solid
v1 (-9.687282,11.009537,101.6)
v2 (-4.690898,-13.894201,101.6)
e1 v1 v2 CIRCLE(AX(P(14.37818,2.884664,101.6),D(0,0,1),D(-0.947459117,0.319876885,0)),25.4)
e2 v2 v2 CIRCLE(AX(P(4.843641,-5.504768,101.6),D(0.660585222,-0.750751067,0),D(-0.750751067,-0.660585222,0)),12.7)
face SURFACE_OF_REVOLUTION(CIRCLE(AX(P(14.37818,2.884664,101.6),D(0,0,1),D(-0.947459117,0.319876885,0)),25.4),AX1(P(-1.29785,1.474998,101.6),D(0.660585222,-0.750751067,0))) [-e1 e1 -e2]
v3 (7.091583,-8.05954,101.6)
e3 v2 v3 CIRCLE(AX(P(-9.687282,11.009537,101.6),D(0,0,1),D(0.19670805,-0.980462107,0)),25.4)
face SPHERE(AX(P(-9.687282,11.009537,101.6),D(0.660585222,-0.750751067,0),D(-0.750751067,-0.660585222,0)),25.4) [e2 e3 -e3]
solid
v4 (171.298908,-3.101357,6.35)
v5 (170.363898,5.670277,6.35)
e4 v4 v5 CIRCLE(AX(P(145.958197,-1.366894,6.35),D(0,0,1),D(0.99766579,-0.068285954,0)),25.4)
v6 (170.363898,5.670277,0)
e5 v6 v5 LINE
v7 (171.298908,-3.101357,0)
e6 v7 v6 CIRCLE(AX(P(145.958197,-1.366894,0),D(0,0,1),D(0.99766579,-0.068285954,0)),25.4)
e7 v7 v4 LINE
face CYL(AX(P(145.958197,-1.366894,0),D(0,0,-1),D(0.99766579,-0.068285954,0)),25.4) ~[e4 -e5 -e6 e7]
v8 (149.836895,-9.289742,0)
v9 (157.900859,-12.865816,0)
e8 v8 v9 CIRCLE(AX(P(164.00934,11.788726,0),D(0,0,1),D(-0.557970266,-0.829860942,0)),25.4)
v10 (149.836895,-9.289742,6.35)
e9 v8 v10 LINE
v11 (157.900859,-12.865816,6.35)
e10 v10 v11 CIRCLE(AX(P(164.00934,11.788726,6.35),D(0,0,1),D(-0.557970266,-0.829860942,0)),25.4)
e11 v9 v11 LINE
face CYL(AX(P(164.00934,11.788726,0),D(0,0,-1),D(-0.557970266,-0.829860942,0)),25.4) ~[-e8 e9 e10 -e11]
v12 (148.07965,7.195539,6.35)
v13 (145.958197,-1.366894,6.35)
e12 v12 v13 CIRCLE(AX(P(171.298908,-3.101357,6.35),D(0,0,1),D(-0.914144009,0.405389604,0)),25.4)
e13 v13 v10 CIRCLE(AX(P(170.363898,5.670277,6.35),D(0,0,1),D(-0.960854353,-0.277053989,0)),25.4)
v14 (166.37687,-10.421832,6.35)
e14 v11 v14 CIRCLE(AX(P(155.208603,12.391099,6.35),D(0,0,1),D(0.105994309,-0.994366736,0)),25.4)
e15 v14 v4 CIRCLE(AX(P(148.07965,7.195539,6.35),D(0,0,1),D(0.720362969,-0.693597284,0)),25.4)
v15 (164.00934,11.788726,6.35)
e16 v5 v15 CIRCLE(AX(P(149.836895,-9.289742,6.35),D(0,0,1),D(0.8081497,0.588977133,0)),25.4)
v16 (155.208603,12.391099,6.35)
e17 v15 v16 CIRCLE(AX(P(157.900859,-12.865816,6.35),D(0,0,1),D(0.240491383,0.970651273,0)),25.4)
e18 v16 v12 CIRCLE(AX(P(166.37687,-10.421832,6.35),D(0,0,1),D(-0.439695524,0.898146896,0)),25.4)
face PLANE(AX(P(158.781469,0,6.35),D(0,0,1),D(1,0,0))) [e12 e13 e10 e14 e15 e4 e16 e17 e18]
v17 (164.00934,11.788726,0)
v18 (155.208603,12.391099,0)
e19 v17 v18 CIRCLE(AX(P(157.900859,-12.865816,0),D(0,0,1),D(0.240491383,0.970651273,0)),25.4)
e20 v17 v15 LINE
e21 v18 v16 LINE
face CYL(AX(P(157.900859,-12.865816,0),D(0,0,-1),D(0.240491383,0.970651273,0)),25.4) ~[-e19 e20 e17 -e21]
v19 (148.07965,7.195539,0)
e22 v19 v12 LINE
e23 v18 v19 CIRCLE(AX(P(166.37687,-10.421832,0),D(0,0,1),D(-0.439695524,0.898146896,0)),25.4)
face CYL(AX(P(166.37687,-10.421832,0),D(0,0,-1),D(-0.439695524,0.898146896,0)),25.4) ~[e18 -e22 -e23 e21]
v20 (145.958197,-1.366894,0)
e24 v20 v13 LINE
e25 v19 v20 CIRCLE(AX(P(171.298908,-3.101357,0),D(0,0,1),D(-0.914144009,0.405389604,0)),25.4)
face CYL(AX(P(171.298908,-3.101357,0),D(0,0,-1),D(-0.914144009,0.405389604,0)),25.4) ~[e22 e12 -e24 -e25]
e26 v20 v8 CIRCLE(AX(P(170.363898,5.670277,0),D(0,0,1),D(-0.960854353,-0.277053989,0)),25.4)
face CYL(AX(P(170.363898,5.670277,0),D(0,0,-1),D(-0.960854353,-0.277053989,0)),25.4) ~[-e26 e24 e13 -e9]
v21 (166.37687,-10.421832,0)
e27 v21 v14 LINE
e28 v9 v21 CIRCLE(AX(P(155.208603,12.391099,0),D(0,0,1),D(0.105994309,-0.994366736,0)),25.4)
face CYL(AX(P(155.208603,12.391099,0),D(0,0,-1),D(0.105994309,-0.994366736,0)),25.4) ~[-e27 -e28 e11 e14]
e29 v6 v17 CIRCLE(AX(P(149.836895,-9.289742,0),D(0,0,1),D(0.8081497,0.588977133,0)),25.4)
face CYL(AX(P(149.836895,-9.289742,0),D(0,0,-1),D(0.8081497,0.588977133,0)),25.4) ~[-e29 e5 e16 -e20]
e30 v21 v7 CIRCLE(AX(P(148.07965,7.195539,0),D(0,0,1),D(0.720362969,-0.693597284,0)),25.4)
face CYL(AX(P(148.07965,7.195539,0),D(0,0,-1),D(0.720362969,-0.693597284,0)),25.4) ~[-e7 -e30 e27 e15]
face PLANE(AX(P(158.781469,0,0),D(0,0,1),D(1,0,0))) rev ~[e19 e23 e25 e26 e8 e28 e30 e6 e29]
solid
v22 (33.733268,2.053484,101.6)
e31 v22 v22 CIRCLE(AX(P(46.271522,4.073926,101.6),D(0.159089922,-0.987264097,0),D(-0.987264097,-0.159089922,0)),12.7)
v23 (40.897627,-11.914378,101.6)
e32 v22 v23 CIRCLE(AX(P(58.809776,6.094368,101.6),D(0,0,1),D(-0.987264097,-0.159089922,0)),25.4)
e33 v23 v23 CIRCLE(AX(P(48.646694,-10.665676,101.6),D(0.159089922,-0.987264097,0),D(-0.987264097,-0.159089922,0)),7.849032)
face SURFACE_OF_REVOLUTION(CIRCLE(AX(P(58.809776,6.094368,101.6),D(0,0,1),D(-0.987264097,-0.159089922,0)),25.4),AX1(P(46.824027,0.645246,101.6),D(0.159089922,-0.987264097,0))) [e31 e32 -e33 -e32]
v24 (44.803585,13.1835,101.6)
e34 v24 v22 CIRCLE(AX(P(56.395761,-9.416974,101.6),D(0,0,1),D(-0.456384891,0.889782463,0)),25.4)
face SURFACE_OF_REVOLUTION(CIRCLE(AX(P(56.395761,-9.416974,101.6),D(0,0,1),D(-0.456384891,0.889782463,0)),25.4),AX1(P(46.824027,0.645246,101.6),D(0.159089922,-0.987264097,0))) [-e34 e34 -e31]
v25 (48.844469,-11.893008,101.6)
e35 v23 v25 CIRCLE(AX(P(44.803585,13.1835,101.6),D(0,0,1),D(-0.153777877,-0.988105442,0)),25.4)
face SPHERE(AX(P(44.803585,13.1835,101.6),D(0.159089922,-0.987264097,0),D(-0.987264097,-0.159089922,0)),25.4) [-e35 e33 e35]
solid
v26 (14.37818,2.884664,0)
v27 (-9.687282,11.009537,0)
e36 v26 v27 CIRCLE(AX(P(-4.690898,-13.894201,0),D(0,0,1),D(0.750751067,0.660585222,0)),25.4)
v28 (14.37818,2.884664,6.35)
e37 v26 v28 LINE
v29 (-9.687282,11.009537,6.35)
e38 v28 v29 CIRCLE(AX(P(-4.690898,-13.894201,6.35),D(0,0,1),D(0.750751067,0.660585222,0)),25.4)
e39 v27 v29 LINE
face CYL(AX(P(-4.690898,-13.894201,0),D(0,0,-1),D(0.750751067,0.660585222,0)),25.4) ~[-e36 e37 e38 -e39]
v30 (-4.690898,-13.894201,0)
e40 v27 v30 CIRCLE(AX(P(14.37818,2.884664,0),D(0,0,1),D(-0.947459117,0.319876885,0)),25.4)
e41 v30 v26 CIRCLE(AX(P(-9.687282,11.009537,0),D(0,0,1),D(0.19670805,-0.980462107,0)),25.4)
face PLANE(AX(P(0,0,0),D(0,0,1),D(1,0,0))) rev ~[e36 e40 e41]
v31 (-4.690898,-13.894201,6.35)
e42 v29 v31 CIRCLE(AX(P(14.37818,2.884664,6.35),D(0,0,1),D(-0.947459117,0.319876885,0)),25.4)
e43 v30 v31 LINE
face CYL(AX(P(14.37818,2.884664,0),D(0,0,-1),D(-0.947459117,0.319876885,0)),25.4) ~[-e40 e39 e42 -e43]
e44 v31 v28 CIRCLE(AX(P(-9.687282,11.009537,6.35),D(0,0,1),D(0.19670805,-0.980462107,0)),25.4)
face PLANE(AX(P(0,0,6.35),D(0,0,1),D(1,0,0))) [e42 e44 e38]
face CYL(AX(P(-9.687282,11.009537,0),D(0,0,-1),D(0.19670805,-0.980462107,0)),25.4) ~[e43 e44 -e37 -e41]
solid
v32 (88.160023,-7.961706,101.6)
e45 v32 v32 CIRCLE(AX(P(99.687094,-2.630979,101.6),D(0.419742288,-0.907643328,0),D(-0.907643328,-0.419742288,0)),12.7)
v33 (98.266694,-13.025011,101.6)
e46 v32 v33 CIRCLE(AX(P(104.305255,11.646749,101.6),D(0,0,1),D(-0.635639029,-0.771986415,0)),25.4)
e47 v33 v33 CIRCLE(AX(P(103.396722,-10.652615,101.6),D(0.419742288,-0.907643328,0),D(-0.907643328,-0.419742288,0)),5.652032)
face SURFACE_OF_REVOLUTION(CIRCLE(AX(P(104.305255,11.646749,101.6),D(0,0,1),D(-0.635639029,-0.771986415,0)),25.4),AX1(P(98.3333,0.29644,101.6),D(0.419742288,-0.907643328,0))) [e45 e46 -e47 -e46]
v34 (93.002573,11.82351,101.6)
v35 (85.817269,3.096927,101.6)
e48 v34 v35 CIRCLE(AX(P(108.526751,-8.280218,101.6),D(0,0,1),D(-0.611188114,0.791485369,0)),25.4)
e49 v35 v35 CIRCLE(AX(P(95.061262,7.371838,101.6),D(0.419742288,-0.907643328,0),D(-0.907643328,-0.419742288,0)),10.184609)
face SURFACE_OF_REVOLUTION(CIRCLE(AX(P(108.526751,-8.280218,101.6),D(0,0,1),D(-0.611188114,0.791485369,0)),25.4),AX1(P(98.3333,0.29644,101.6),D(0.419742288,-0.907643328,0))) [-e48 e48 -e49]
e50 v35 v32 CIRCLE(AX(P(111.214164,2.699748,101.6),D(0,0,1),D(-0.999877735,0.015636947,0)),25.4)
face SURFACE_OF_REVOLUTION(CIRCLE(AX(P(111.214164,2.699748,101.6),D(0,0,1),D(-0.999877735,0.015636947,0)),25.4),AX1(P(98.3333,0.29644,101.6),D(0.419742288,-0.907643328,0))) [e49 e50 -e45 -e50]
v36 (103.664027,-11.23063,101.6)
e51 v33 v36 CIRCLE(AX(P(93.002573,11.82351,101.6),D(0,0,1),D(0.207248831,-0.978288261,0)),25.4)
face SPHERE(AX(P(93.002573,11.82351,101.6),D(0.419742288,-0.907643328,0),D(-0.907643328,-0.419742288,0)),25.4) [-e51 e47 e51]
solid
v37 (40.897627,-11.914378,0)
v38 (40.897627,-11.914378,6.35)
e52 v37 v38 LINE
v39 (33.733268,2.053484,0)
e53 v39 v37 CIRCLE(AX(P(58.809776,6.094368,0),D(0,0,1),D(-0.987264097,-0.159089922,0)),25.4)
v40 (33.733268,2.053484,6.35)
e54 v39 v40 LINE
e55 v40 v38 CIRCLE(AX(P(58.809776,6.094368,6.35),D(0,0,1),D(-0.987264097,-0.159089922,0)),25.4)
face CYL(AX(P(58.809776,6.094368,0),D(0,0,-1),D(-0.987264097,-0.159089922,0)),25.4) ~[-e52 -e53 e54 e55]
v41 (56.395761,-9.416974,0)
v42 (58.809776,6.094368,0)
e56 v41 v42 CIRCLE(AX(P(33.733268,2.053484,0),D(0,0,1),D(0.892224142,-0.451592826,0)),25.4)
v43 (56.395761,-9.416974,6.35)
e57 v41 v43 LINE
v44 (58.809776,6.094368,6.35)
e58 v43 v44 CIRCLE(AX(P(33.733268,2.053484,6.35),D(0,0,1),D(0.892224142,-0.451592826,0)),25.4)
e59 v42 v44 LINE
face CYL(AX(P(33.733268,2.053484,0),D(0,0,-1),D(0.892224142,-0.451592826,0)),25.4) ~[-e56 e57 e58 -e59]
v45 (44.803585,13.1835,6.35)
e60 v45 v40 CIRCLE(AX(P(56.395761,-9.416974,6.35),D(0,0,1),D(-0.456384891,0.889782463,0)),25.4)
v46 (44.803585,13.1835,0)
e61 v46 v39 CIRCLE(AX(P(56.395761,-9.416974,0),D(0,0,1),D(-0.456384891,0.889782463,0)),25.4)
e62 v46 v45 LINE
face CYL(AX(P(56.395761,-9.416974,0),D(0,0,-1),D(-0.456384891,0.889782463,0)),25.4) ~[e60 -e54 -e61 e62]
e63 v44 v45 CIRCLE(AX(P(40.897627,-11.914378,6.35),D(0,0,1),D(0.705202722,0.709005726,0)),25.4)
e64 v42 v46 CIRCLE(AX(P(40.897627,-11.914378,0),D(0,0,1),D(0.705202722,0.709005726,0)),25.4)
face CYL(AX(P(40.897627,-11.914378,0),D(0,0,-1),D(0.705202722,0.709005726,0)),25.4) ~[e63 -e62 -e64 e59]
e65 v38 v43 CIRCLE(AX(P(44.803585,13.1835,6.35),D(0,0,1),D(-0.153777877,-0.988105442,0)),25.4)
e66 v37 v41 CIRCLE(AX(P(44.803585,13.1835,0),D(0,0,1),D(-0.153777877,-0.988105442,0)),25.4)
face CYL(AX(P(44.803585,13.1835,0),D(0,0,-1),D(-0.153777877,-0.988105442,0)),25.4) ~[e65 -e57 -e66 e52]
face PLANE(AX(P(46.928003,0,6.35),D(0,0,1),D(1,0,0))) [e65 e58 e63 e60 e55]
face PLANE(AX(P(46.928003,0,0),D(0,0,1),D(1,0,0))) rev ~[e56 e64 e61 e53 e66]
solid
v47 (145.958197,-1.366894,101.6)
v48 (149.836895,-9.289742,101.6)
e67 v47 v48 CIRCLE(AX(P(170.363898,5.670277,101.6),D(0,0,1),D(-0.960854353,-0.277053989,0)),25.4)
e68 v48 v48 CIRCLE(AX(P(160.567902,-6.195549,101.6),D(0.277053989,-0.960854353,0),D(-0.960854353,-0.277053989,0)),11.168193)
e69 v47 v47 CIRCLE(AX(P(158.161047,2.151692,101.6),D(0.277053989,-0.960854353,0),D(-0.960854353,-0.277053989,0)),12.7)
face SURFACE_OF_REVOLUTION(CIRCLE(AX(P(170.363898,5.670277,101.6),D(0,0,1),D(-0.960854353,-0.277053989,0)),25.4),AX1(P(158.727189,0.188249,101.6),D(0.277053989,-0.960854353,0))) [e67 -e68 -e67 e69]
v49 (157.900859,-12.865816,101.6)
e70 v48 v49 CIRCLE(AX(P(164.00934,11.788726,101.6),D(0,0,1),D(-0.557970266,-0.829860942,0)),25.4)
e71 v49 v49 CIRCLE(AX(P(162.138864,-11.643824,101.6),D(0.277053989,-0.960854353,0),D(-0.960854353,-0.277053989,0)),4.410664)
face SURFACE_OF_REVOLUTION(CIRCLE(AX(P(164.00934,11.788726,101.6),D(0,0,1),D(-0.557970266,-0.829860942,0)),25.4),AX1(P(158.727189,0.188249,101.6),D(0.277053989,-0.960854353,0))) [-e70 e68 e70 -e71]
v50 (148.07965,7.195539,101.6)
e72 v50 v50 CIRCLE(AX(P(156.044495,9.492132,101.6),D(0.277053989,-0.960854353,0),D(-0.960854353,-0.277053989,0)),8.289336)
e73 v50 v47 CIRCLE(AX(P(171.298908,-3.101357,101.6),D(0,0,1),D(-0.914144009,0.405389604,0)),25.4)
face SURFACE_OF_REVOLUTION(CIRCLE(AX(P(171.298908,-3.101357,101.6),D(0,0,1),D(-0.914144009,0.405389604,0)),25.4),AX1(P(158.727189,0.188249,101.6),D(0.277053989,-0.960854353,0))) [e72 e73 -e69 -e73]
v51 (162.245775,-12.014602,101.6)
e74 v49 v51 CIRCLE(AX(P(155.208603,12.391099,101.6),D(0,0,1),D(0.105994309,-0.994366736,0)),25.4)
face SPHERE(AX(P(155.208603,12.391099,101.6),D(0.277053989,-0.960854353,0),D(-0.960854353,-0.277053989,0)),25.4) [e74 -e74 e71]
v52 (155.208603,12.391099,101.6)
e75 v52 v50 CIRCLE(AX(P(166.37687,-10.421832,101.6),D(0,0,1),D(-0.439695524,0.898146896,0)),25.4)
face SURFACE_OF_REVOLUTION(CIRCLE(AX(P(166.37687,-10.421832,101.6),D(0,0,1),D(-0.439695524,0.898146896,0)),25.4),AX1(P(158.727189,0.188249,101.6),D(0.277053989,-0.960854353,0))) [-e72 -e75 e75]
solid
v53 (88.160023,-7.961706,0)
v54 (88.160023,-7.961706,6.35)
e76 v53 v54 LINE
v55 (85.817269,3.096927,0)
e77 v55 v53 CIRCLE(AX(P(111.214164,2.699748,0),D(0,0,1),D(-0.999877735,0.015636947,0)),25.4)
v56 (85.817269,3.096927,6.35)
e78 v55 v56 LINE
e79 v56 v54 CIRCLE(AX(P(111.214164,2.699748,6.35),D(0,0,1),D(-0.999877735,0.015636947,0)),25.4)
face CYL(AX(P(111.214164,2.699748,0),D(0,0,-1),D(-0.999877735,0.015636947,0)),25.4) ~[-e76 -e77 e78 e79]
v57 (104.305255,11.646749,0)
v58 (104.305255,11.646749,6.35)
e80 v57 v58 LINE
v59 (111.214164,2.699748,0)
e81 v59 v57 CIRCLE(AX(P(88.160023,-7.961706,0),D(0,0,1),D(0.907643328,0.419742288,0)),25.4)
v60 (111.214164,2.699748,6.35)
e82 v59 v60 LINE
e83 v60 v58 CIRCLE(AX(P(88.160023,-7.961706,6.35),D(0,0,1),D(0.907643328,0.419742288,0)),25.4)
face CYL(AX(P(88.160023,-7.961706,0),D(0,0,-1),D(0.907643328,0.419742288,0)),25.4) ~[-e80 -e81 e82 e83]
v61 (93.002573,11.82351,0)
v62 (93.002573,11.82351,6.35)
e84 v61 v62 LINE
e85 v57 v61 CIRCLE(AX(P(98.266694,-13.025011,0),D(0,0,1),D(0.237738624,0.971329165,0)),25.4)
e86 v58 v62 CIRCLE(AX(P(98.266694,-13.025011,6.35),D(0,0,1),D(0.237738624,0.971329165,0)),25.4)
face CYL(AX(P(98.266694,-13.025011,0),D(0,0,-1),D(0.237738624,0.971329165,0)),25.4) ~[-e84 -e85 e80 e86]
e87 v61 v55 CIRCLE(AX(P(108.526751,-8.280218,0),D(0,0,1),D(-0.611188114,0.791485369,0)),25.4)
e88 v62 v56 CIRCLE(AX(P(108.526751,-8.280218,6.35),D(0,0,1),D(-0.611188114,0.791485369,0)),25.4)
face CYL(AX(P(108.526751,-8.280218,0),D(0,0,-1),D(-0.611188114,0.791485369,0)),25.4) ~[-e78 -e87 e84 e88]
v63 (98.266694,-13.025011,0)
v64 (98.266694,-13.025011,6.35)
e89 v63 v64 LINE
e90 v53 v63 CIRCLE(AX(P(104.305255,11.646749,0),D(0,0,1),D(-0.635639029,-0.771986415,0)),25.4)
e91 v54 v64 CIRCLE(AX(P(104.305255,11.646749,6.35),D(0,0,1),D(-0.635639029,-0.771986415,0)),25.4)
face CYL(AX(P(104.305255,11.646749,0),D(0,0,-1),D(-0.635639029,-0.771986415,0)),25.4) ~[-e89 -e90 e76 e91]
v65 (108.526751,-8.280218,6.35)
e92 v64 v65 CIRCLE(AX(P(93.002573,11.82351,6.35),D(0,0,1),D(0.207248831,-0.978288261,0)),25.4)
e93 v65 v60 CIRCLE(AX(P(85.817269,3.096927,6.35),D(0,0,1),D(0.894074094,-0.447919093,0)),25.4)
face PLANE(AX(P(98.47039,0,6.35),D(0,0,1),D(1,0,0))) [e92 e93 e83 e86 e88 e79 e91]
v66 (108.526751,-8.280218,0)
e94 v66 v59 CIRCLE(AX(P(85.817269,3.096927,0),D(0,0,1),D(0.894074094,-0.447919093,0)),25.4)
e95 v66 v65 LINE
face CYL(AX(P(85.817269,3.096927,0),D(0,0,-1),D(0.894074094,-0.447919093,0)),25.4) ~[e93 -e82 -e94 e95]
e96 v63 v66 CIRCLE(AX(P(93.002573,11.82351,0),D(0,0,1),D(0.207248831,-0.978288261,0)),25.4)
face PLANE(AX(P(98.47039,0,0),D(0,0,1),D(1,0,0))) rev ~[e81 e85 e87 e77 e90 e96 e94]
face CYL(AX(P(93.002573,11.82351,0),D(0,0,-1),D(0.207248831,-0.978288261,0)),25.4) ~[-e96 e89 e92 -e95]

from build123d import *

# Parameters (mm, degrees)
F2_DEPTH = 6.35


# Not quite as in the source:
# - a variable given as a bare number and used for a length is read in inches; the dataset says mm whatever the document's units were


with BuildPart() as f2:
    # F1 (on Top) → F2 (new body)
    with BuildSketch(Plane.XY):
        with BuildLine():
            ThreePointArc((14.3781795579, 2.8846639207), (3.433975334, 10.1712608559), (-9.6872820156, 11.0095367969))
            ThreePointArc((-9.6872820156, 11.0095367969), (-10.5255579567, -2.1117205527), (-4.6908975422, -13.8942007176))
            ThreePointArc((-4.6908975422, -13.8942007176), (7.0915826227, -8.0595403031), (14.3781795579, 2.8846639207))
        make_face()
    extrude(amount=F2_DEPTH)


with BuildPart() as f2b:
    # F1 (on Top) → F2, piece 2 (new body)
    with BuildSketch(Plane.XY):
        with BuildLine():
            ThreePointArc((44.8035849855, 13.1835004697), (38.3870157524, 8.4951750576), (33.7332679985, 2.0534836852))
            ThreePointArc((33.7332679985, 2.0534836852), (36.2093014936, -5.4978085238), (40.8976269057, -11.9143777569))
            ThreePointArc((40.8976269057, -11.9143777569), (48.8444689961, -11.8930075889), (56.3957612051, -9.4169740938))
            ThreePointArc((56.3957612051, -9.4169740938), (58.8311462251, -1.8524743946), (58.8097760571, 6.0943676958))
            ThreePointArc((58.8097760571, 6.0943676958), (52.3680846847, 10.7481154497), (44.8035849855, 13.1835004697))
        make_face()
    extrude(amount=F2_DEPTH)


with BuildPart() as f2c:
    # F1 (on Top) → F2, piece 3 (new body)
    with BuildSketch(Plane.XY):
        with BuildLine():
            ThreePointArc((104.3052545657, 11.6467493191), (98.6638719794, 12.371883009), (93.0025732068, 11.8235103614))
            ThreePointArc((93.0025732068, 11.8235103614), (88.9182963481, 7.8650133115), (85.817269298, 3.096926946))
            ThreePointArc((85.817269298, 3.096926946), (86.3656419456, -2.5643718266), (88.1600232362, -7.9617056256))
            ThreePointArc((88.1600232362, -7.9617056256), (92.9281096017, -11.0627326756), (98.2666935225, -13.0250114719))
            ThreePointArc((98.2666935225, -13.0250114719), (103.6640273214, -11.2306301812), (108.5267512927, -8.2802180181))
            ThreePointArc((108.5267512927, -8.2802180181), (110.489030089, -2.9416340973), (111.2141637789, 2.699748489))
            ThreePointArc((111.2141637789, 2.699748489), (108.2637516157, 7.5624724603), (104.3052545657, 11.6467493191))
        make_face()
    extrude(amount=F2_DEPTH)


with BuildPart() as f2d:
    # F1 (on Top) → F2, piece 4 (new body)
    with BuildSketch(Plane.XY):
        with BuildLine():
            ThreePointArc((164.0093399435, 11.788726154), (159.6353220402, 12.4748948753), (155.2086033491, 12.3910989139))
            ThreePointArc((155.2086033491, 12.3910989139), (151.4168504878, 10.1051701371), (148.079650239, 7.1955387803))
            ThreePointArc((148.079650239, 7.1955387803), (146.6443657243, 3.0071239853), (145.958197003, -1.3668939181))
            ThreePointArc((145.958197003, -1.3668939181), (147.5509664107, -5.4979888997), (149.8368951876, -9.2897417609))
            ThreePointArc((149.8368951876, -9.2897417609), (153.7124440102, -11.4305316752), (157.9008588052, -12.8658161898))
            ThreePointArc((157.9008588052, -12.8658161898), (162.2457746766, -12.0146016436), (166.3768696582, -10.4218322359))
            ThreePointArc((166.3768696582, -10.4218322359), (169.1581181539, -6.9769059756), (171.2989080681, -3.101357153))
            ThreePointArc((171.2989080681, -3.101357153), (171.2151121068, 1.3253615381), (170.3638975606, 5.6702774095))
            ThreePointArc((170.3638975606, 5.6702774095), (167.4542662038, 9.0074776583), (164.0093399435, 11.788726154))
        make_face()
    extrude(amount=F2_DEPTH)


with BuildPart() as f5:
    # F4 (on offset) → F5 (revolve)
    with BuildSketch(Plane.XY.offset(101.6)):
        with BuildLine():
            Line((7.0915826227, -8.0595403031), (-9.6872820156, 11.0095367969))
            ThreePointArc((-9.6872820156, 11.0095367969), (-10.5255579567, -2.1117205527), (-4.6908975422, -13.8942007176))
            ThreePointArc((-4.6908975422, -13.8942007176), (1.5844163483, -11.7524669811), (7.0915826227, -8.0595403031))
        make_face()
    revolve(axis=Axis((-1.2978496965, 1.4749982469, 101.6), (0.660585222, -0.7507510669, 0)))


with BuildPart() as f6:
    # F4 (on offset) → F6 (revolve)
    with BuildSketch(Plane.XY.offset(101.6)):
        with BuildLine():
            ThreePointArc((44.8035849855, 13.1835004697), (38.3870157524, 8.4951750576), (33.7332679985, 2.0534836852))
            ThreePointArc((33.7332679985, 2.0534836852), (36.2093014936, -5.4978085238), (40.8976269057, -11.9143777569))
            ThreePointArc((40.8976269057, -11.9143777569), (44.8718888853, -12.2164076911), (48.8444689961, -11.8930075889))
            Line((48.8444689961, -11.8930075889), (44.8035849855, 13.1835004697))
        make_face()
    revolve(axis=Axis((46.8240269908, 0.6452464404, 101.6), (0.1590899217, -0.9872640968, 0)))


with BuildPart() as f7:
    # F4 (on offset) → F7 (revolve)
    with BuildSketch(Plane.XY.offset(101.6)):
        with BuildLine():
            Line((103.6640273214, -11.2306301812), (93.0025732068, 11.8235103614))
            ThreePointArc((93.0025732068, 11.8235103614), (88.9182963481, 7.8650133115), (85.817269298, 3.096926946))
            ThreePointArc((85.817269298, 3.096926946), (86.3656419456, -2.5643718266), (88.1600232362, -7.9617056256))
            ThreePointArc((88.1600232362, -7.9617056256), (92.9281096017, -11.0627326756), (98.2666935225, -13.0250114719))
            ThreePointArc((98.2666935225, -13.0250114719), (101.0157455678, -12.2793747089), (103.6640273214, -11.2306301812))
        make_face()
    revolve(axis=Axis((98.3333002641, 0.2964400901, 101.6), (0.419742288, -0.9076433285, 0)))


with BuildPart() as f8:
    # F4 (on offset) → F8 (revolve)
    with BuildSketch(Plane.XY.offset(101.6)):
        with BuildLine():
            Line((162.2457746766, -12.0146016436), (155.2086033491, 12.3910989139))
            ThreePointArc((155.2086033491, 12.3910989139), (151.4168504878, 10.1051701371), (148.079650239, 7.1955387803))
            ThreePointArc((148.079650239, 7.1955387803), (146.6443657243, 3.0071239853), (145.958197003, -1.3668939181))
            ThreePointArc((145.958197003, -1.3668939181), (147.5509664107, -5.4979888997), (149.8368951876, -9.2897417609))
            ThreePointArc((149.8368951876, -9.2897417609), (153.7124440102, -11.4305316752), (157.9008588052, -12.8658161898))
            ThreePointArc((157.9008588052, -12.8658161898), (160.0918991558, -12.5350604786), (162.2457746766, -12.0146016436))
        make_face()
    revolve(axis=Axis((158.7271890128, 0.1882486352, 101.6), (0.2770539893, -0.9608543527, 0)))


solid = Compound([f2.part, f2b.part, f2c.part, f2d.part, f5.part, f6.part, f7.part, f8.part])
